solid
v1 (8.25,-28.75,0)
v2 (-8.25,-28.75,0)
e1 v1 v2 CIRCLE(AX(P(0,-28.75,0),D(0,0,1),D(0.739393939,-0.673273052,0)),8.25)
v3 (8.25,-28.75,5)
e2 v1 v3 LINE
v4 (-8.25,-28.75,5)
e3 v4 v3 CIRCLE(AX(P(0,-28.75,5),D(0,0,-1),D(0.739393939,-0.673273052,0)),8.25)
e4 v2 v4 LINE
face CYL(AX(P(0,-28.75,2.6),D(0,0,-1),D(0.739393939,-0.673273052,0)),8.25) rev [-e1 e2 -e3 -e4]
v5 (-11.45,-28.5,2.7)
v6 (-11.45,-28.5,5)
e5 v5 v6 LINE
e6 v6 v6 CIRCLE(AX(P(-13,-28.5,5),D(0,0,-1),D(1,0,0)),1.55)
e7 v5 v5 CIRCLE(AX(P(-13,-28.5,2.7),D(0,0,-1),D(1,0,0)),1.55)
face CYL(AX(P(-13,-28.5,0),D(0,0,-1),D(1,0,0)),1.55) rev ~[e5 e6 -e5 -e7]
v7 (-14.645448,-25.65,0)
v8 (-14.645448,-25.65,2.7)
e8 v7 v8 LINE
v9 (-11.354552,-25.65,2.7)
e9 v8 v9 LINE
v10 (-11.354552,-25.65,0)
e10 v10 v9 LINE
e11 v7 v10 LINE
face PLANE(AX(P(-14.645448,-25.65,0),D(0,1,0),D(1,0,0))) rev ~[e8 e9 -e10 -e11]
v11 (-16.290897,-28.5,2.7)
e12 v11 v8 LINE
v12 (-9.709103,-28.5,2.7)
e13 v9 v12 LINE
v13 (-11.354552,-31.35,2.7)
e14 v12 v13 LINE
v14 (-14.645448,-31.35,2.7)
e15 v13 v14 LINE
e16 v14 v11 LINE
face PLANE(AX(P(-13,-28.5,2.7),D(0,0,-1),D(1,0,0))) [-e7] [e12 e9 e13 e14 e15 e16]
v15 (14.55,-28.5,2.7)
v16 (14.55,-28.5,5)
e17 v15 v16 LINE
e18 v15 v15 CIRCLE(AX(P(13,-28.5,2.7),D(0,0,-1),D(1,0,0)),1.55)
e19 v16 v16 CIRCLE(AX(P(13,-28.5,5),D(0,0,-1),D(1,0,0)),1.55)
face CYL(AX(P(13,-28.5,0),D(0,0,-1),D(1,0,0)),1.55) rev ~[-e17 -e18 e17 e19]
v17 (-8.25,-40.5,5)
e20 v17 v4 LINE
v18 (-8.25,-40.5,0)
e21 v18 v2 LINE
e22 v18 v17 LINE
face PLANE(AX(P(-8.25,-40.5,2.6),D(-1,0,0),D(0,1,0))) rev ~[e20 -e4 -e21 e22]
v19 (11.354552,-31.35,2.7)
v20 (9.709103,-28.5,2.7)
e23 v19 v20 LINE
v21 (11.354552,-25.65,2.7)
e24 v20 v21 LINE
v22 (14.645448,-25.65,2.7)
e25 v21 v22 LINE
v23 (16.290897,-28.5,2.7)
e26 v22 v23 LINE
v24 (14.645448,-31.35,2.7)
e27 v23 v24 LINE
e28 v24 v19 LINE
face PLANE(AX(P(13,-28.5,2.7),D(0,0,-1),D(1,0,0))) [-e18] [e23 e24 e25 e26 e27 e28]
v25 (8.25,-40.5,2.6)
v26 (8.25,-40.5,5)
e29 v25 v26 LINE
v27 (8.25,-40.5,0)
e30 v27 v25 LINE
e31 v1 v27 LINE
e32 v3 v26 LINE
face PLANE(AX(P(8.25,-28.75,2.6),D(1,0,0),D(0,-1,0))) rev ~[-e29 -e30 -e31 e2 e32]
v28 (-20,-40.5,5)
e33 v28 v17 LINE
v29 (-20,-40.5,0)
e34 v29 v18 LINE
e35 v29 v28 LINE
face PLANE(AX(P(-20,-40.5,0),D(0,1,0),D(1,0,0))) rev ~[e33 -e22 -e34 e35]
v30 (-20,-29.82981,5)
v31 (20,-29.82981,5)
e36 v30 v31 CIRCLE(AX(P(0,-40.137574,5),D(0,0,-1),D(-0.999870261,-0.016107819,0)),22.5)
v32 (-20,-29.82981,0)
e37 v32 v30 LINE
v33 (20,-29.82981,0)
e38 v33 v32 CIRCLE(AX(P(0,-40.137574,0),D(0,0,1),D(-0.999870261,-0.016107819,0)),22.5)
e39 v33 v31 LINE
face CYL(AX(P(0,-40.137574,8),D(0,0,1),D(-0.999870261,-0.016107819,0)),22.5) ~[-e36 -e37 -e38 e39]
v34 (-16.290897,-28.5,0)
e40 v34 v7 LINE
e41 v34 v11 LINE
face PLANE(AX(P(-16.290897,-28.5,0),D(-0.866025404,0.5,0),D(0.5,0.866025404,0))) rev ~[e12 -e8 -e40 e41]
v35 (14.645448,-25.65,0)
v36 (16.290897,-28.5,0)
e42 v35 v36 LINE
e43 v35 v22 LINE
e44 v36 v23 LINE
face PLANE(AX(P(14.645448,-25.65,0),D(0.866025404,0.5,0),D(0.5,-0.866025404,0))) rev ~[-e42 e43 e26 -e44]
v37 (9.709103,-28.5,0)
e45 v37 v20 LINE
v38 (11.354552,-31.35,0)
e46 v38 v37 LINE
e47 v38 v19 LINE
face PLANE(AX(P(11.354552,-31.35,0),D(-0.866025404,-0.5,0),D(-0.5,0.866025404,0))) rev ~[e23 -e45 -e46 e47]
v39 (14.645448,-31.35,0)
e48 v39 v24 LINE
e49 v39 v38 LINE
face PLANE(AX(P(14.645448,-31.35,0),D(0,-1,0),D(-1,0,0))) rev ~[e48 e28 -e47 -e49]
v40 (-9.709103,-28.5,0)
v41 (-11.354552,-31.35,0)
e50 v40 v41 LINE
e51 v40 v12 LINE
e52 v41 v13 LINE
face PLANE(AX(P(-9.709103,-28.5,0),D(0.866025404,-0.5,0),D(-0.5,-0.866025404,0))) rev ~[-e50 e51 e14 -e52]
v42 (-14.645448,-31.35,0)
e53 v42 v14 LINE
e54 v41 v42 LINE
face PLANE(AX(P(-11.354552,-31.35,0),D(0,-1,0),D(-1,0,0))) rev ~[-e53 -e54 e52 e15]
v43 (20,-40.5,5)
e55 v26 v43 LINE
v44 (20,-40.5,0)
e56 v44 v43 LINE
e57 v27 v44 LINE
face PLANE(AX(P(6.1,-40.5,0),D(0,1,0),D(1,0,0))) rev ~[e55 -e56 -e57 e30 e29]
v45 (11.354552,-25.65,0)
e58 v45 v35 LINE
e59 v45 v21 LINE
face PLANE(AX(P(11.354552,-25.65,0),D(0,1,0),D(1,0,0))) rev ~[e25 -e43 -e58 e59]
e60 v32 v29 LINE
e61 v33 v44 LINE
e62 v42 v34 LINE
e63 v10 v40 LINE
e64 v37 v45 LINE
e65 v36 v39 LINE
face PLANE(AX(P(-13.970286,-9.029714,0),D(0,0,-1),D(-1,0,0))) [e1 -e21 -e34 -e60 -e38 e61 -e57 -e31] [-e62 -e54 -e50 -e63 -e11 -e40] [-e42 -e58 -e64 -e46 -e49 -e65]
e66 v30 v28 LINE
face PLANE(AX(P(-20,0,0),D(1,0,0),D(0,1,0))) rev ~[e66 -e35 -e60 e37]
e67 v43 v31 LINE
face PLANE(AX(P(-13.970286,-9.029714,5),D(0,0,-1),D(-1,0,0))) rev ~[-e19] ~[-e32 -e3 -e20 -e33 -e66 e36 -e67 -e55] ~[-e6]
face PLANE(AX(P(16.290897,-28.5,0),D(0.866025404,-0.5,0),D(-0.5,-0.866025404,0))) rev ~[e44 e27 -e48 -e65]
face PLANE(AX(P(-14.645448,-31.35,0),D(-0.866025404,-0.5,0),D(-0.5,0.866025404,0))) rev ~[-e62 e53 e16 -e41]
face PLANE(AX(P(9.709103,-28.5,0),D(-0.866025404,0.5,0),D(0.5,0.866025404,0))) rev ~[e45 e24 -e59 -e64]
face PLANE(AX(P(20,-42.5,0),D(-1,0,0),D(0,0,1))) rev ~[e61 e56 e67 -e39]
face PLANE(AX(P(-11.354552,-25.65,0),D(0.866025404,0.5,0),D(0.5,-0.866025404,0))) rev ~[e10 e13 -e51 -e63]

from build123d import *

# Parameters (mm, degrees)
F0_R         = 2.6
F0_R_2       = 2
F0_W         = 7
F0_H         = 10
F1_DEPTH     = 8
F2_DEPTH     = 2.6
F0_R_3       = 6
F3_DEPTH     = 25
F4_R         = 1.65
F5_DEPTH     = 50
F6_DEPTH     = 5
F7_DEPTH     = 2
F9_DEPTH     = 2.6
F10_W        = 6.9695419073
F10_H        = 5.4
F11_DEPTH    = 2.15
F12_R        = 1.65
F13_DEPTH    = 25
F14_R        = 1.55
F15_DEPTH    = 2.7
F16_DEPTH    = 25
F17_R        = 6.99999
F18_W        = 16
F18_H        = 35
F19_DEPTH    = 25
F20_W        = 10
F20_H        = 8
F21_DEPTH    = 16
F22_R        = 5
F23_W        = 31
F23_H        = 60
F24_DEPTH    = 4
F25_W        = 31
F25_H        = 10
F26_DEPTH    = 25
F27_R        = 5
F28_T1_DEPTH = 15
F29_T1_DEPTH = 8
F30_W        = 13.0527611077
F30_H        = 9
F31_DEPTH    = 25
F32_T4_DEPTH = 48
F33_W        = 8
F33_H        = 11
F34_DEPTH    = 8
F35_T4_DEPTH = 8
F36_R        = 2
F37_R        = 2
F39_DEPTH    = 25
F40_DEPTH    = 25
F41_DEPTH    = 7
F42_R        = 2
F43_DEPTH    = 11.75
F44_R        = 2
F45_DEPTH    = 11.75
F47_DEPTH    = 3


# Not quite as in the source:
# - a fillet or chamfer that OpenCascade refuses, or shapes differently, is made with other operations: its cross-section is extruded or revolved along the edge and cut away or added
# - a fillet or chamfer is up to 0.001 mm smaller than in the source, because OpenCascade refuses the exact size


with BuildPart() as f1:
    # F0 (on Top) → F1 (new body)
    with BuildSketch(Plane.XY):
        with BuildLine():
            ThreePointArc((6.1, -34.304502678), (0, -20.5), (-6.1, -34.304502678))
            Line((-6.1, -34.304502678), (-6.1, -28.75))
            ThreePointArc((-6.1, -28.75), (0, -22.65), (6.1, -28.75))
            Line((6.1, -28.75), (6.1, -34.304502678))
        make_face()
        with BuildLine():
            Line((27, 42.5), (-27, 42.5))
            Line((-27, 42.5), (-27, -26.5))
            Line((-27, -26.5), (-20, -26.5))
            Line((-20, -26.5), (-20, -42.5))
            Line((-20, -42.5), (-6.1, -42.5))
            Line((-6.1, -42.5), (-6.1, -34.304502678))
            ThreePointArc((-6.1, -34.304502678), (0, -20.5), (6.1, -34.304502678))
            Line((6.1, -34.304502678), (6.1, -42.5))
            Line((6.1, -42.5), (20, -42.5))
            Line((20, -42.5), (20, -16.5))
            Line((20, -16.5), (27, -16.5))
            Line((27, -16.5), (27, 42.5))
        make_face()
        with Locations((-20.4, -6.1)):
            Circle(F0_R, mode=Mode.SUBTRACT)
        with Locations((-12.5, -13)):
            Circle(F0_R_2, mode=Mode.SUBTRACT)
        with BuildLine():
            add(Edge.make_bspline(
                [(7.5, -13), (7.5, -5.2057713659), (-3.75, -9.102885683), (-15, -13), (-3.75, -16.897114317), (7.5, -20.7942286341), (7.5, -13)],
                knots=[0, 0, 0, 2.0943951024, 2.0943951024, 4.1887902048, 4.1887902048, 6.2831853072, 6.2831853072, 6.2831853072], degree=2, weights=[1, 0.5, 1, 0.5, 1, 0.5, 1]))
        make_face(mode=Mode.SUBTRACT)
        with Locations((20.4, -6.1)):
            Circle(F0_R, mode=Mode.SUBTRACT)
        with Locations((-15.5, 12.5)):
            Rectangle(F0_W, F0_H, mode=Mode.SUBTRACT)
        with Locations((-20.4, 30.9)):
            Circle(F0_R, mode=Mode.SUBTRACT)
        with Locations((15.5, 12.5)):
            Rectangle(F0_W, F0_H, mode=Mode.SUBTRACT)
        with Locations((20.4, 30.9)):
            Circle(F0_R, mode=Mode.SUBTRACT)
    extrude(amount=F1_DEPTH)

    # F0 (on Top) → F2 (cut)
    with BuildSketch(Plane.XY):
        with BuildLine():
            ThreePointArc((6.1, -34.304502678), (0, -20.5), (-6.1, -34.304502678))
            Line((-6.1, -34.304502678), (-6.1, -28.75))
            ThreePointArc((-6.1, -28.75), (0, -22.65), (6.1, -28.75))
            Line((6.1, -28.75), (6.1, -34.304502678))
        make_face()
    extrude(amount=F2_DEPTH, mode=Mode.SUBTRACT)

    # F4 (on Right) → F5 (cut, symmetric)
    with BuildSketch(Plane.YZ):
        with Locations((-36.45, 5.5)):
            Circle(F4_R)
    extrude(amount=F5_DEPTH, both=True, mode=Mode.SUBTRACT)

    # F6 (add): a face of the model
    f6_faces = [f1.faces().sort_by_distance(p)[0] for p in [
        (13.05, -42.5, 4),
    ]]
    extrude(f6_faces, amount=F6_DEPTH)

    # F7 (cut): a face of the model
    f7_faces = [f1.faces().sort_by_distance(p)[0] for p in [
        (-13.05, -42.5, 4),
    ]]
    extrude(f7_faces, amount=-F7_DEPTH, mode=Mode.SUBTRACT)

    # F8 (on face) → F9 (cut, through all)
    with BuildSketch(Plane(origin=(0, 0, 0), x_dir=(1, 0, 0), z_dir=(0, 0, -1))):
        with BuildLine():
            ThreePointArc((6.1, 34.304502678), (7.6937474614, 31.7280446605), (8.25, 28.75))
            Line((8.25, 28.75), (8.25, 47.5))
            Line((8.25, 47.5), (6.1, 47.5))
            Line((6.1, 47.5), (6.1, 34.304502678))
        make_face()
        with BuildLine():
            Line((-8.25, 40.5), (-8.25, 28.75))
            ThreePointArc((-8.25, 28.75), (-7.6937474614, 31.7280446605), (-6.1, 34.304502678))
            Line((-6.1, 34.304502678), (-6.1, 40.5))
            Line((-6.1, 40.5), (-8.25, 40.5))
        make_face()
    extrude(amount=-F9_DEPTH, mode=Mode.SUBTRACT)

    # F10 (on face) → F11 (cut, through all)
    with BuildSketch(Plane(origin=(6.1, 0, 0), x_dir=(0, -1, 0), z_dir=(-1, 0, 0))):
        with Locations((44.0152290463, 5.3)):
            Rectangle(F10_W, F10_H)
    extrude(amount=-F11_DEPTH, mode=Mode.SUBTRACT)

    # F12 (on face) → F13 (cut)
    with BuildSketch(Plane(origin=(8.25, 0, 0), x_dir=(0, -1, 0), z_dir=(-1, 0, 0))):
        with Locations((43.8150316477, 4)):
            Circle(F12_R)
    extrude(amount=-F13_DEPTH, mode=Mode.SUBTRACT)

    # F14 (on face) → F15 (cut)
    with BuildSketch(Plane(origin=(0, 0, 0), x_dir=(1, 0, 0), z_dir=(0, 0, -1))):
        Polygon((-14.6454482672, 25.65), (-11.3545517328, 25.65), (-9.7091034656, 28.5), (-11.3545517328, 31.35), (-14.6454482672, 31.35), (-16.2908965344, 28.5), align=None)
        with Locations((-13, 28.5)):
            Circle(F14_R, mode=Mode.SUBTRACT)
        Polygon((11.3545517328, 31.35), (9.7091034656, 28.5), (11.3545517328, 25.65), (14.6454482672, 25.65), (16.2908965344, 28.5), (14.6454482672, 31.35), align=None)
        with Locations((13, 28.5)):
            Circle(F14_R, mode=Mode.SUBTRACT)
    extrude(amount=-F15_DEPTH, mode=Mode.SUBTRACT)

    # F16 (cut): faces of the model
    f16_faces = [f1.faces().sort_by_distance(p)[0] for p in [
        (-13, -28.5, 0),
        (13, -28.5, 0),
    ]]
    extrude(f16_faces, amount=-F16_DEPTH, mode=Mode.SUBTRACT)

    # F17 (radius 7 in the source; OpenCascade refuses exactly that, so slightly less here)
    f17_edges = [f1.edges().sort_by_distance(p)[0] for p in [
        (27, 42.5, 4),
        (-27, 42.5, 4),
        (-27, -26.5, 4),
        (27, -16.5, 4),
    ]]
    fillet(f17_edges, radius=F17_R)

    # F18 (on face) → F19 (cut)
    with BuildSketch(Plane(origin=(0, 0, 0), x_dir=(1, 0, 0), z_dir=(0, 0, -1))):
        with Locations((0, -15)):
            Rectangle(F18_W, F18_H)
    extrude(amount=-F19_DEPTH, mode=Mode.SUBTRACT)

    # F20 (on face) → F21 (join, through all)
    with BuildSketch(Plane.YZ.offset(-8)):
        with Locations((15.5, 4)):
            Rectangle(F20_W, F20_H)
    extrude(amount=F21_DEPTH)

    # F22
    f22_edges = [f1.edges().sort_by_distance(p)[0] for p in [
        (-8, 10.5, 4),
        (-8, -2.5, 4),
        (8, -2.5, 4),
        (8, 10.5, 4),
        (8, 20.5, 4),
        (-8, 20.5, 4),
        (-8, 32.5, 4),
        (8, 32.5, 4),
    ]]
    fillet(f22_edges, radius=F22_R)

    # F23 (on face) → F24 (cut)
    with BuildSketch(Plane(origin=(0, 0, 0), x_dir=(1, 0, 0), z_dir=(0, 0, -1))):
        with Locations((0, -12.5)):
            Rectangle(F23_W, F23_H)
    extrude(amount=-F24_DEPTH, mode=Mode.SUBTRACT)

    # F25 (on face) → F26 (cut)
    with BuildSketch(Plane(origin=(0, 0, 4), x_dir=(1, 0, 0), z_dir=(0, 0, -1))):
        with Locations((0, 12.5)):
            Rectangle(F25_W, F25_H)
    extrude(amount=-F26_DEPTH, mode=Mode.SUBTRACT)

    # F27
    f27_edges = [f1.edges().sort_by_distance(p)[0] for p in [
        (-19, 12.5, 0),
        (19, 12.5, 0),
    ]]
    fillet(f27_edges, radius=F27_R)

    # F28: fillet of radius 5 on 2 edges, made by hand

    # F28_s2 → F28_t1 (join)
    with BuildSketch(Plane.XZ.offset(-7.5)):
        with BuildLine():
            ThreePointArc((-15.5, 0), (-13.7632981746, 2.8729833462), (-10.6010205144, 4))
            Line((-10.6010205144, 4), (-10.6010205144, 4.1))
            Line((-10.6010205144, 4.1), (-15.5, 4.1))
            Line((-15.5, 4.1), (-15.6, 4))
            ThreePointArc((-15.6, 4), (-15.6, 2), (-15.5979795897, 0.02))
            Line((-15.5979795897, 0.02), (-15.5, 0))
        make_face()
        with BuildLine():
            ThreePointArc((15.5, 0), (13.7632981746, 2.8729833462), (10.6010205144, 4))
            Line((10.6010205144, 4), (10.6010205144, 4.1))
            Line((10.6010205144, 4.1), (15.5, 4.1))
            Line((15.5, 4.1), (15.6, 4))
            ThreePointArc((15.6, 4), (15.6, 2), (15.5979795897, 0.02))
            Line((15.5979795897, 0.02), (15.5, 0))
        make_face()
    extrude(amount=F28_T1_DEPTH)

    # F29: fillet of radius 5 on 4 edges, made by hand

    # F29_s2 → F29_t1 (join)
    with BuildSketch(Plane.XY):
        with BuildLine():
            ThreePointArc((-10.5, -7.5), (-14.0355339059, -8.9644660941), (-15.5, -12.5))
            Line((-15.5, -12.5), (-15.5, -7.5))
            Line((-15.5, -7.5), (-10.5, -7.5))
        make_face()
        with BuildLine():
            ThreePointArc((10.5, -7.5), (14.0355339059, -8.9644660941), (15.5, -12.5))
            Line((15.5, -12.5), (15.5, -7.5))
            Line((15.5, -7.5), (10.5, -7.5))
        make_face()
        with BuildLine():
            ThreePointArc((10.5, -17.5), (14.0355339059, -16.0355339059), (15.5, -12.5))
            Line((15.5, -12.5), (15.5, -17.5))
            Line((15.5, -17.5), (10.5, -17.5))
        make_face()
        with BuildLine():
            ThreePointArc((-15.5, -12.5), (-14.0355339059, -16.0355339059), (-10.5, -17.5))
            Line((-10.5, -17.5), (-15.5, -17.5))
            Line((-15.5, -17.5), (-15.5, -12.5))
        make_face()
    extrude(amount=F29_T1_DEPTH)

    # F30 (on face) → F31 (cut)
    with BuildSketch(Plane(origin=(0, 0, 0), x_dir=(1, 0, 0), z_dir=(0, 0, -1))):
        with Locations((-26.5263805538, 22)):
            Rectangle(F30_W, F30_H)
    extrude(amount=-F31_DEPTH, mode=Mode.SUBTRACT)

    # F32: fillet of radius 8 on 1 edges, made by hand


with BuildPart() as f3:
    # F0 (on Top) → F3 (new body)
    with BuildSketch(Plane.XY):
        with Locations((0, -28.75)):
            Circle(F0_R_3)
    extrude(amount=F3_DEPTH)


with BuildPart() as f32_tool2:
    # F32_s3 → F32_t4 (new body)
    with BuildSketch(Plane.XY.offset(-20)):
        with BuildLine():
            ThreePointArc((-19, -17.5), (-24.6568542495, -15.1568542495), (-27, -9.5))
            Line((-27, -9.5), (-27, -17.5))
            Line((-27, -17.5), (-19, -17.5))
        make_face()
    extrude(amount=F32_T4_DEPTH)

    split(bisect_by=Plane.YZ.offset(-20), keep=Keep.BOTTOM)


with BuildPart() as f1_1:
    add(f1.part)

    # F32_t1: cut F32_tool2
    add(f32_tool2.part, mode=Mode.SUBTRACT)

    # F33 (on Top) → F34 (join, through all)
    with BuildSketch(Plane.XY):
        with Locations((-0.022189036, -12.5)):
            Rectangle(F33_W, F33_H)
    extrude(amount=F34_DEPTH)

    # F35: fillet of radius 5 on 1 edges, made by hand


with BuildPart() as f35_tool2:
    # F35_s3 → F35_t4 (new body)
    with BuildSketch(Plane.YZ.offset(3.977810964)):
        with BuildLine():
            ThreePointArc((-12, 0), (-8.4644660941, 1.4644660941), (-7, 5))
            Line((-7, 5), (-6.9, 5))
            Line((-6.9, 5), (-6.9, -0.1))
            Line((-6.9, -0.1), (-12, -0.1))
            Line((-12, -0.1), (-12, 0))
        make_face()
    extrude(amount=-F35_T4_DEPTH)

    split(bisect_by=Plane.XY.offset(4), keep=Keep.BOTTOM)


with BuildPart() as f1_2:
    add(f1_1.part)

    # F35_t1: cut F35_tool2
    add(f35_tool2.part, mode=Mode.SUBTRACT)

    # F36
    f36_edges = [f1_2.edges().sort_by_distance(p)[0] for p in [
        (3.977811, -7.5, 6),
        (-4.022189, -7.5, 6),
    ]]
    fillet(f36_edges, radius=F36_R)

    # F37
    f37_edges = [f1_2.edges().sort_by_distance(p)[0] for p in [
        (3.977811, -17.5, 4),
        (-4.022189, -17.5, 4),
    ]]
    fillet(f37_edges, radius=F37_R)

    # F38 (on face) → F39 (cut)
    with BuildSketch(Plane.XY.offset(8)):
        with BuildLine():
            ThreePointArc((-22.4970808651, -40.5), (0, -17.6375740767), (22.4970808651, -40.5))
            Line((22.4970808651, -40.5), (37.6332104206, -40.5))
            Line((37.6332104206, -40.5), (37.6332104206, 50.0679649413))
            Line((37.6332104206, 50.0679649413), (-32.9294279218, 50.0679649413))
            Line((-32.9294279218, 50.0679649413), (-32.9294279218, -40.5))
            Line((-32.9294279218, -40.5), (-22.4970808651, -40.5))
        make_face()
    extrude(amount=-F39_DEPTH, mode=Mode.SUBTRACT)

    # F40 (cut): a face of the model
    f40_faces = [f1_2.faces().sort_by_distance(p)[0] for p in [
        (-6.3595128612, -34.625, 2.6),
    ]]
    extrude(f40_faces, amount=-F40_DEPTH, mode=Mode.SUBTRACT)

    # F41 (cut, through all): a face of the model
    f41_faces = [f1_2.faces().sort_by_distance(p)[0] for p in [
        (14.125, -47.5, 4),
    ]]
    extrude(f41_faces, amount=-F41_DEPTH, mode=Mode.SUBTRACT)

    # F42 (on face) → F43 (join, through all)
    with BuildSketch(Plane(origin=(-20, 0, 0), x_dir=(0, -1, 0), z_dir=(-1, 0, 0))):
        with Locations((36.45, 5.5)):
            Circle(F42_R)
    extrude(amount=-F43_DEPTH)

    # F44 (on face) → F45 (join, through all)
    with BuildSketch(Plane.YZ.offset(20)):
        with Locations((-36.45, 5.5)):
            Circle(F44_R)
    extrude(amount=-F45_DEPTH)

    # F47 (cut): a face of the model
    f47_faces = [f1_2.faces().sort_by_distance(p)[0] for p in [
        (0, -18.098300733, 8),
    ]]
    extrude(f47_faces, amount=-F47_DEPTH, mode=Mode.SUBTRACT)


solid = f1_2.part
